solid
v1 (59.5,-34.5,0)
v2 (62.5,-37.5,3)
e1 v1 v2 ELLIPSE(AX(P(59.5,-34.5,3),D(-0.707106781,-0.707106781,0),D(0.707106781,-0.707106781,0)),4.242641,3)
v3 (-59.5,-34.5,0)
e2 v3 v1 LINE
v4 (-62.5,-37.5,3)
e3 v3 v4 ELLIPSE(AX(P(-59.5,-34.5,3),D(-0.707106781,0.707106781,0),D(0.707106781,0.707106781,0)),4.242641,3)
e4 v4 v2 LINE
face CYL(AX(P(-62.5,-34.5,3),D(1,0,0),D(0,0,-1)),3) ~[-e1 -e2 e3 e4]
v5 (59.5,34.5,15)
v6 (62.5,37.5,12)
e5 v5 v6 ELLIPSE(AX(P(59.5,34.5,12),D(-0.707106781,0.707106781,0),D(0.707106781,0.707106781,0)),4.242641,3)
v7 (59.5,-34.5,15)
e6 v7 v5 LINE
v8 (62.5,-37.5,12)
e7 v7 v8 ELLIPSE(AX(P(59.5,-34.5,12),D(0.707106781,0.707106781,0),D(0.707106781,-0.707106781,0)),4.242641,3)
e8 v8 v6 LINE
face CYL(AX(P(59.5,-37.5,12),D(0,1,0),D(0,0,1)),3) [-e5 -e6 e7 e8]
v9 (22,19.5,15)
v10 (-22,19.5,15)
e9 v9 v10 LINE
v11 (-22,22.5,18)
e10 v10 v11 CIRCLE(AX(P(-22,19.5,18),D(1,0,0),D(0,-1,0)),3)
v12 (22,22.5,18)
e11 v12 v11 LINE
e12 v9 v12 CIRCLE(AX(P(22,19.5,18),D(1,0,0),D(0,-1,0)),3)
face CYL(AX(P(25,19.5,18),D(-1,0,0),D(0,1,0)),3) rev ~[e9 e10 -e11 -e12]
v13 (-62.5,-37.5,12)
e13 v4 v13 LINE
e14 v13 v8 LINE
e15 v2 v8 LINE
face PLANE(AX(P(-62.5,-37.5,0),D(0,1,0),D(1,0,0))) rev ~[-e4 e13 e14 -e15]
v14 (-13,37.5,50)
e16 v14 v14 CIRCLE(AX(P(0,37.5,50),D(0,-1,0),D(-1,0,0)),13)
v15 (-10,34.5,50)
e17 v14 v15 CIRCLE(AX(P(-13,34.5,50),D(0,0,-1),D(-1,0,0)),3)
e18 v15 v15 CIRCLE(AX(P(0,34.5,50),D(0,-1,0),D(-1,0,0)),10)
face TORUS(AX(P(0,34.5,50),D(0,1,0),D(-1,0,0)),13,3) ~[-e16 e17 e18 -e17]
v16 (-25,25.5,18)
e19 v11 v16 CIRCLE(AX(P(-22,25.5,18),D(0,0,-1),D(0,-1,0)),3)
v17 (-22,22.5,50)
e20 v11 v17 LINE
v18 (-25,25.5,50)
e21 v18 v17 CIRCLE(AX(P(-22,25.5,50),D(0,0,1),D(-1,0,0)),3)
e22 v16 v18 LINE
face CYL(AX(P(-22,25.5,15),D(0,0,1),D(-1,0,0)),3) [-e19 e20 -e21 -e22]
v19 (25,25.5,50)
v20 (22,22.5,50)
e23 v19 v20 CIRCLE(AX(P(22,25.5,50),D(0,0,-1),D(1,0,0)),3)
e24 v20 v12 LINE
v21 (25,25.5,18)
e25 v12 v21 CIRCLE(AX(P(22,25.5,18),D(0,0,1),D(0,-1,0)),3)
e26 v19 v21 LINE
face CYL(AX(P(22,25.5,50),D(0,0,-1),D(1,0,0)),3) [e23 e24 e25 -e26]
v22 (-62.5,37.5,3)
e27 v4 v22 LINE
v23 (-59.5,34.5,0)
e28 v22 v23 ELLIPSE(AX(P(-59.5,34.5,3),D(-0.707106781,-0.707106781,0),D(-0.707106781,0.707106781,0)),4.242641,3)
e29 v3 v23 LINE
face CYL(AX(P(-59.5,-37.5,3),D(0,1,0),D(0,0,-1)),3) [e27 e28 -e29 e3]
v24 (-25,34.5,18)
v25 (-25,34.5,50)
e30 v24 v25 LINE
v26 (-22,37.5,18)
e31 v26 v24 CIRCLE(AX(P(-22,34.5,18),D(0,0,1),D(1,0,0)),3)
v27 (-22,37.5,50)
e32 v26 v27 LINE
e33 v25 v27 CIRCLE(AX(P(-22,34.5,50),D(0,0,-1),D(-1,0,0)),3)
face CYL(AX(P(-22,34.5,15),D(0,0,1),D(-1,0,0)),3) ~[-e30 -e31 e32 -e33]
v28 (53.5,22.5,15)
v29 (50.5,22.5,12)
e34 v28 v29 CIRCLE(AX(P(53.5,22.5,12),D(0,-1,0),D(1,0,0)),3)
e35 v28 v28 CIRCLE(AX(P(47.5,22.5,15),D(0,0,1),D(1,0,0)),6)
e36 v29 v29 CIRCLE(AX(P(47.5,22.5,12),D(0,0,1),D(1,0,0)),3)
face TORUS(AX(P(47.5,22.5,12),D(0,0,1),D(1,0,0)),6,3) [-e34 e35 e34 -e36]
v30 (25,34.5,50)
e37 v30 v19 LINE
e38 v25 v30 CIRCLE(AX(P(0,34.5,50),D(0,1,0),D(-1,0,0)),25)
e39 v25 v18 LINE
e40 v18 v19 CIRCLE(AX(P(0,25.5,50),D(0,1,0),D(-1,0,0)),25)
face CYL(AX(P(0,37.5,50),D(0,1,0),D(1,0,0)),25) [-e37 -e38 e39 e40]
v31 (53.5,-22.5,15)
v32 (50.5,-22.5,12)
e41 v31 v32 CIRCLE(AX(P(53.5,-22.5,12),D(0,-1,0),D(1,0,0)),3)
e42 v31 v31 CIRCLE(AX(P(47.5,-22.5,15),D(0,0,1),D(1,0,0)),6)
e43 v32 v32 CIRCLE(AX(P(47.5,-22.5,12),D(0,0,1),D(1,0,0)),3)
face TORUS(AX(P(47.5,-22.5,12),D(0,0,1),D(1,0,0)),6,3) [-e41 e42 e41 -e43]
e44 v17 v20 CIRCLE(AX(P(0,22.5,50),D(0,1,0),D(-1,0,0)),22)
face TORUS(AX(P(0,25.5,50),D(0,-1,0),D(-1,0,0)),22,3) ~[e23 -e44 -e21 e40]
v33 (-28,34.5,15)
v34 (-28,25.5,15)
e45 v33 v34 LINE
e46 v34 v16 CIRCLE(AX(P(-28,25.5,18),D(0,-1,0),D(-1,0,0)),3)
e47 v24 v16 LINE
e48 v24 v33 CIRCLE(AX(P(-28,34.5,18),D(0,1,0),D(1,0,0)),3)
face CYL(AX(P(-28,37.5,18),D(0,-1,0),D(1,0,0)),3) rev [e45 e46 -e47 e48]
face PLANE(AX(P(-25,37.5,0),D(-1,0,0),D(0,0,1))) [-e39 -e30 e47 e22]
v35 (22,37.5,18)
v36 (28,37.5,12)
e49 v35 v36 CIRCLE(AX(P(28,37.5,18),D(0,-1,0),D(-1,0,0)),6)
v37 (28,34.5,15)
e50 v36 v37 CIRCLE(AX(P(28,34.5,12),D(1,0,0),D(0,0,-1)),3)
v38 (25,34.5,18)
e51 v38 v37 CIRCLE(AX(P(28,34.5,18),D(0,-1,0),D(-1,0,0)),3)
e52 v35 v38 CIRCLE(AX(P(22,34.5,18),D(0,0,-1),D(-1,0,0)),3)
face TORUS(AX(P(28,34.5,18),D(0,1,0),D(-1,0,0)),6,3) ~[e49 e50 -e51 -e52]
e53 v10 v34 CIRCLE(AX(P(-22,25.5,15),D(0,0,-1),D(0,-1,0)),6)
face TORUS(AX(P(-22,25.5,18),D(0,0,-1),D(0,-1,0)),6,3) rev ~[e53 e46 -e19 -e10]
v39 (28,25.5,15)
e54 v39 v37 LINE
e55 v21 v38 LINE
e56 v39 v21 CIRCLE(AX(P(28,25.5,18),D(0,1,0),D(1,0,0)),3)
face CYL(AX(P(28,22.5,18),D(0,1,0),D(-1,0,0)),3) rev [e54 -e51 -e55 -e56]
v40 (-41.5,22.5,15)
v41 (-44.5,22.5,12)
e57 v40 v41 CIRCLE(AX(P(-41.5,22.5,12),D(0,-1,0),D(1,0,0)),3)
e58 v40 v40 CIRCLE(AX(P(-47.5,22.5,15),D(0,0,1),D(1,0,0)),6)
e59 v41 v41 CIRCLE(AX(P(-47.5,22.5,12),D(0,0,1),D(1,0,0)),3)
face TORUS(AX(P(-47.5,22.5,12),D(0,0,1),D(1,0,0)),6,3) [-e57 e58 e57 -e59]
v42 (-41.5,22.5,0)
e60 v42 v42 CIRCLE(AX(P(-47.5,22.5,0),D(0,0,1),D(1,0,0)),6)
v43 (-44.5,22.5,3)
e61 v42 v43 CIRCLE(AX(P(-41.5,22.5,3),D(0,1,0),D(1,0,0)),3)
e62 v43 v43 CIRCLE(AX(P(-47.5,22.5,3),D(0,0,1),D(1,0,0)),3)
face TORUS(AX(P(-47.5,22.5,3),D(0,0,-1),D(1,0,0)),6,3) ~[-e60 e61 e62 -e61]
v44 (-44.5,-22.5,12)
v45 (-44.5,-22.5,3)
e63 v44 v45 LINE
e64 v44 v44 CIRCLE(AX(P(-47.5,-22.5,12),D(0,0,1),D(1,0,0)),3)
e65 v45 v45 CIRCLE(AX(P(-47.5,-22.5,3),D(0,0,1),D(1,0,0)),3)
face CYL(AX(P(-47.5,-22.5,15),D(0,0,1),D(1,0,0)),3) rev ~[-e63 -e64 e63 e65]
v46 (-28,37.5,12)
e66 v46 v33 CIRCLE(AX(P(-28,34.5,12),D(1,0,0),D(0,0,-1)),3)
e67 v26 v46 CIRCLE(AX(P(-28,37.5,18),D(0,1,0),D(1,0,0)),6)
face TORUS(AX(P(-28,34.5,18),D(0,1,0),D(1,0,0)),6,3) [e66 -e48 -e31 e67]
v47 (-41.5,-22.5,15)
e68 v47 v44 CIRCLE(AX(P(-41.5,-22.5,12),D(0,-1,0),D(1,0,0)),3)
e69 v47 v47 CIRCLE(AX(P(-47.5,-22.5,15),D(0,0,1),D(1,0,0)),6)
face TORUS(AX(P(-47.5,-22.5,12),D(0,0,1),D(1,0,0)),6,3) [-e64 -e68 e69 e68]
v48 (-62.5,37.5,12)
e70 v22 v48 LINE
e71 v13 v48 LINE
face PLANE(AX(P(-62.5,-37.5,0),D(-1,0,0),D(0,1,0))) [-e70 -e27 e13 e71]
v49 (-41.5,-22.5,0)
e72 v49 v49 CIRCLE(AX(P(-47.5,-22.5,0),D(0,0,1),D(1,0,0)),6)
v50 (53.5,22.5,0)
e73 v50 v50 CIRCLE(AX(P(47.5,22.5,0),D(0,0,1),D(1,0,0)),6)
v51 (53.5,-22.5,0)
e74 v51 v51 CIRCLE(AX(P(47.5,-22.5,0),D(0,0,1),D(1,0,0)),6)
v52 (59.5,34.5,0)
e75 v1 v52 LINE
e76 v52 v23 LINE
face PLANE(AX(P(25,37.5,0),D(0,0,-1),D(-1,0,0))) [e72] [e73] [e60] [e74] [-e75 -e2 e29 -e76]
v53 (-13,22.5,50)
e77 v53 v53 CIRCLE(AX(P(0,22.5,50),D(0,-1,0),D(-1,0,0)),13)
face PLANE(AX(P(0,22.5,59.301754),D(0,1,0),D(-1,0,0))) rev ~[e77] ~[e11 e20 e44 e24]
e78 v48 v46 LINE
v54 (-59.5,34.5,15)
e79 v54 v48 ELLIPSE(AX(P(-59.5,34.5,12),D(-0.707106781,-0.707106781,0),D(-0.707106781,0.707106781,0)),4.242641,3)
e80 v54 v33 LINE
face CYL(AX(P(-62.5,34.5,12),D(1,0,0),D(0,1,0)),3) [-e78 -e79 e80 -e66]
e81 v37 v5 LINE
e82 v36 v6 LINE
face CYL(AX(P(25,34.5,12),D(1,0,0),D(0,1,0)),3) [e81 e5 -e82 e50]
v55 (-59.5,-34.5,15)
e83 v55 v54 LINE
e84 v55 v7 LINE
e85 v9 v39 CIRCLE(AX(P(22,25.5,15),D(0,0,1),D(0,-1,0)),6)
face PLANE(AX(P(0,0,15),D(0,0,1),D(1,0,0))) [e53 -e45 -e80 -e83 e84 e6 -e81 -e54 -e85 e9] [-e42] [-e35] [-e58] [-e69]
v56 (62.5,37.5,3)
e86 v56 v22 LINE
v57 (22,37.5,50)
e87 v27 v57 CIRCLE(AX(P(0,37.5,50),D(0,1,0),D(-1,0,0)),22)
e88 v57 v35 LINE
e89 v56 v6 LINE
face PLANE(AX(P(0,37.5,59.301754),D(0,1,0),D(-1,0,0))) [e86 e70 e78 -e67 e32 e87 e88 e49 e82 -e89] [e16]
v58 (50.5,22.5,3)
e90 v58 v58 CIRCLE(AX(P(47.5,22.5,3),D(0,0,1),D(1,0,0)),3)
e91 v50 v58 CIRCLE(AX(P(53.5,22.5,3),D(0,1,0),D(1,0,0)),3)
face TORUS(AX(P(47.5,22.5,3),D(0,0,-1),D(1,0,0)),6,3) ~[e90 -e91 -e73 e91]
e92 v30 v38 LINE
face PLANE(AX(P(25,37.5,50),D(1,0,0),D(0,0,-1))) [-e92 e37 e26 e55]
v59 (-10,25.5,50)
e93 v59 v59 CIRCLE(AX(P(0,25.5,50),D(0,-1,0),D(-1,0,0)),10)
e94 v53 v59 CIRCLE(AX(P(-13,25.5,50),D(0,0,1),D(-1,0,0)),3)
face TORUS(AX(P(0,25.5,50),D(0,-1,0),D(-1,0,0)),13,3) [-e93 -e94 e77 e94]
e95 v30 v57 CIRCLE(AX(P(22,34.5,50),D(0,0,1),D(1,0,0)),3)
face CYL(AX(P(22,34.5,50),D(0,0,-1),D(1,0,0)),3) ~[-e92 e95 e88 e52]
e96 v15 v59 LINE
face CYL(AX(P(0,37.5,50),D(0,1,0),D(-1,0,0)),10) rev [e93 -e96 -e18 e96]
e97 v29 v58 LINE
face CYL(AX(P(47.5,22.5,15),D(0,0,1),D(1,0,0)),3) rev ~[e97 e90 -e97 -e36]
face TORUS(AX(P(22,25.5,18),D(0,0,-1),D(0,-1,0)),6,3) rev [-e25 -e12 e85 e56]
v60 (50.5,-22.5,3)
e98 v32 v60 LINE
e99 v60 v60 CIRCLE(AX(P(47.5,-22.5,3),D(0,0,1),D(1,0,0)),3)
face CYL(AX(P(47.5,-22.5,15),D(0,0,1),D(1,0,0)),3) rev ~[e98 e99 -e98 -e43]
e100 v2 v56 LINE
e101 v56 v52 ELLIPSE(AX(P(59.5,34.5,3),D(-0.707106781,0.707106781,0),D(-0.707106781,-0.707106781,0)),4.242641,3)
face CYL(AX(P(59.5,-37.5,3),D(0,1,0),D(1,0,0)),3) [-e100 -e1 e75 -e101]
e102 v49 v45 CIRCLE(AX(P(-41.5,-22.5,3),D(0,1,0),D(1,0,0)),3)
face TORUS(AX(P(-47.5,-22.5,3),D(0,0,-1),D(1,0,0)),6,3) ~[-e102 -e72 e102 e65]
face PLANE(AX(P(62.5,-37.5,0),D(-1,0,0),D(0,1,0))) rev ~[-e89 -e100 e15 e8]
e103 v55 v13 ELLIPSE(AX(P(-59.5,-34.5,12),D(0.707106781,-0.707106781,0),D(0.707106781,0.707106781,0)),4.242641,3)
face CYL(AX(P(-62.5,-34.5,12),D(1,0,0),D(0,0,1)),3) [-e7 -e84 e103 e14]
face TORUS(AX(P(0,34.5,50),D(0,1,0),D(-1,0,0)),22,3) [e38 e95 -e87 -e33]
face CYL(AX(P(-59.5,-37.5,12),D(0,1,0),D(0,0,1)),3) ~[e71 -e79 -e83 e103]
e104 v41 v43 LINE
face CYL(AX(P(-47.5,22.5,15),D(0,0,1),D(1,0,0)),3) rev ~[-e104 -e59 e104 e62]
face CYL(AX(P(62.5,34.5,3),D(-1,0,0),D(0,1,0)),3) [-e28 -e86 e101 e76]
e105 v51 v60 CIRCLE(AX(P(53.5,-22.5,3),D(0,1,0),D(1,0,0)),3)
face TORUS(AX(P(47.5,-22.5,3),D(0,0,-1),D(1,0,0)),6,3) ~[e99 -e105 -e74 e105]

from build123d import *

# Parameters (mm, degrees)
F0_W     = 125
F0_H     = 75
F1_DEPTH = 15
F2_W     = 50
F2_H     = 15
F3_DEPTH = 15
F4_R     = 3
F5_DEPTH = 25
F6_R     = 3


with BuildPart() as f1:
    # F0 (on Top) → F1 (new body)
    with BuildSketch(Plane.XY):
        Rectangle(F0_W, F0_H)
    extrude(amount=F1_DEPTH)

    # F2 (on face) → F3 (join)
    with BuildSketch(Plane(origin=(0, 37.5, 0), x_dir=(-1, 0, 0), z_dir=(0, 1, 0))):
        with BuildLine():
            Line((10, 50), (25, 50))
            ThreePointArc((25, 50), (0, 75), (-25, 50))
            Line((-25, 50), (-10, 50))
            ThreePointArc((-10, 50), (0, 60), (10, 50))
        make_face()
        with BuildLine():
            ThreePointArc((-25, 50), (0, 25), (25, 50))
            Line((25, 50), (10, 50))
            ThreePointArc((10, 50), (0, 40), (-10, 50))
            Line((-10, 50), (-25, 50))
        make_face()
        with BuildLine():
            Line((25, 15), (25, 50))
            ThreePointArc((25, 50), (0, 25), (-25, 50))
            Line((-25, 50), (-25, 15))
            Line((-25, 15), (25, 15))
        make_face()
        with Locations((0, 7.5)):
            Rectangle(F2_W, F2_H)
    extrude(amount=-F3_DEPTH)

    # F4 (on face) → F5 (cut)
    with BuildSketch(Plane.XY.offset(15)):
        with Locations((-47.5, 22.5)):
            Circle(F4_R)
        with Locations((-47.5, -22.5)):
            Circle(F4_R)
        with Locations((47.5, -22.5)):
            Circle(F4_R)
        with Locations((47.5, 22.5)):
            Circle(F4_R)
    extrude(amount=-F5_DEPTH, mode=Mode.SUBTRACT)

    # F6
    f6_edges = [f1.edges().sort_by_distance(p)[0] for p in [
        (-25, 22.5, 32.5),
        (0, 22.5, 15),
        (25, 22.5, 32.5),
        (0, 22.5, 75),
        (10, 22.5, 50),
        (0, 37.5, 0),
        (0, -37.5, 15),
        (-62.5, 0, 15),
        (62.5, 0, 15),
        (-43.75, 37.5, 15),
        (43.75, 37.5, 15),
        (-25, 30, 15),
        (25, 30, 15),
        (-50.5, -22.5, 15),
        (44.5, -22.5, 15),
        (-50.5, 22.5, 15),
        (44.5, 22.5, 15),
        (0, -37.5, 0),
        (-62.5, 0, 0),
        (62.5, 0, 0),
        (-50.5, -22.5, 0),
        (44.5, -22.5, 0),
        (-50.5, 22.5, 0),
        (44.5, 22.5, 0),
        (10, 37.5, 50),
        (25, 37.5, 32.5),
        (0, 37.5, 75),
        (-25, 37.5, 32.5),
    ]]
    fillet(f6_edges, radius=F6_R)


solid = f1.part
